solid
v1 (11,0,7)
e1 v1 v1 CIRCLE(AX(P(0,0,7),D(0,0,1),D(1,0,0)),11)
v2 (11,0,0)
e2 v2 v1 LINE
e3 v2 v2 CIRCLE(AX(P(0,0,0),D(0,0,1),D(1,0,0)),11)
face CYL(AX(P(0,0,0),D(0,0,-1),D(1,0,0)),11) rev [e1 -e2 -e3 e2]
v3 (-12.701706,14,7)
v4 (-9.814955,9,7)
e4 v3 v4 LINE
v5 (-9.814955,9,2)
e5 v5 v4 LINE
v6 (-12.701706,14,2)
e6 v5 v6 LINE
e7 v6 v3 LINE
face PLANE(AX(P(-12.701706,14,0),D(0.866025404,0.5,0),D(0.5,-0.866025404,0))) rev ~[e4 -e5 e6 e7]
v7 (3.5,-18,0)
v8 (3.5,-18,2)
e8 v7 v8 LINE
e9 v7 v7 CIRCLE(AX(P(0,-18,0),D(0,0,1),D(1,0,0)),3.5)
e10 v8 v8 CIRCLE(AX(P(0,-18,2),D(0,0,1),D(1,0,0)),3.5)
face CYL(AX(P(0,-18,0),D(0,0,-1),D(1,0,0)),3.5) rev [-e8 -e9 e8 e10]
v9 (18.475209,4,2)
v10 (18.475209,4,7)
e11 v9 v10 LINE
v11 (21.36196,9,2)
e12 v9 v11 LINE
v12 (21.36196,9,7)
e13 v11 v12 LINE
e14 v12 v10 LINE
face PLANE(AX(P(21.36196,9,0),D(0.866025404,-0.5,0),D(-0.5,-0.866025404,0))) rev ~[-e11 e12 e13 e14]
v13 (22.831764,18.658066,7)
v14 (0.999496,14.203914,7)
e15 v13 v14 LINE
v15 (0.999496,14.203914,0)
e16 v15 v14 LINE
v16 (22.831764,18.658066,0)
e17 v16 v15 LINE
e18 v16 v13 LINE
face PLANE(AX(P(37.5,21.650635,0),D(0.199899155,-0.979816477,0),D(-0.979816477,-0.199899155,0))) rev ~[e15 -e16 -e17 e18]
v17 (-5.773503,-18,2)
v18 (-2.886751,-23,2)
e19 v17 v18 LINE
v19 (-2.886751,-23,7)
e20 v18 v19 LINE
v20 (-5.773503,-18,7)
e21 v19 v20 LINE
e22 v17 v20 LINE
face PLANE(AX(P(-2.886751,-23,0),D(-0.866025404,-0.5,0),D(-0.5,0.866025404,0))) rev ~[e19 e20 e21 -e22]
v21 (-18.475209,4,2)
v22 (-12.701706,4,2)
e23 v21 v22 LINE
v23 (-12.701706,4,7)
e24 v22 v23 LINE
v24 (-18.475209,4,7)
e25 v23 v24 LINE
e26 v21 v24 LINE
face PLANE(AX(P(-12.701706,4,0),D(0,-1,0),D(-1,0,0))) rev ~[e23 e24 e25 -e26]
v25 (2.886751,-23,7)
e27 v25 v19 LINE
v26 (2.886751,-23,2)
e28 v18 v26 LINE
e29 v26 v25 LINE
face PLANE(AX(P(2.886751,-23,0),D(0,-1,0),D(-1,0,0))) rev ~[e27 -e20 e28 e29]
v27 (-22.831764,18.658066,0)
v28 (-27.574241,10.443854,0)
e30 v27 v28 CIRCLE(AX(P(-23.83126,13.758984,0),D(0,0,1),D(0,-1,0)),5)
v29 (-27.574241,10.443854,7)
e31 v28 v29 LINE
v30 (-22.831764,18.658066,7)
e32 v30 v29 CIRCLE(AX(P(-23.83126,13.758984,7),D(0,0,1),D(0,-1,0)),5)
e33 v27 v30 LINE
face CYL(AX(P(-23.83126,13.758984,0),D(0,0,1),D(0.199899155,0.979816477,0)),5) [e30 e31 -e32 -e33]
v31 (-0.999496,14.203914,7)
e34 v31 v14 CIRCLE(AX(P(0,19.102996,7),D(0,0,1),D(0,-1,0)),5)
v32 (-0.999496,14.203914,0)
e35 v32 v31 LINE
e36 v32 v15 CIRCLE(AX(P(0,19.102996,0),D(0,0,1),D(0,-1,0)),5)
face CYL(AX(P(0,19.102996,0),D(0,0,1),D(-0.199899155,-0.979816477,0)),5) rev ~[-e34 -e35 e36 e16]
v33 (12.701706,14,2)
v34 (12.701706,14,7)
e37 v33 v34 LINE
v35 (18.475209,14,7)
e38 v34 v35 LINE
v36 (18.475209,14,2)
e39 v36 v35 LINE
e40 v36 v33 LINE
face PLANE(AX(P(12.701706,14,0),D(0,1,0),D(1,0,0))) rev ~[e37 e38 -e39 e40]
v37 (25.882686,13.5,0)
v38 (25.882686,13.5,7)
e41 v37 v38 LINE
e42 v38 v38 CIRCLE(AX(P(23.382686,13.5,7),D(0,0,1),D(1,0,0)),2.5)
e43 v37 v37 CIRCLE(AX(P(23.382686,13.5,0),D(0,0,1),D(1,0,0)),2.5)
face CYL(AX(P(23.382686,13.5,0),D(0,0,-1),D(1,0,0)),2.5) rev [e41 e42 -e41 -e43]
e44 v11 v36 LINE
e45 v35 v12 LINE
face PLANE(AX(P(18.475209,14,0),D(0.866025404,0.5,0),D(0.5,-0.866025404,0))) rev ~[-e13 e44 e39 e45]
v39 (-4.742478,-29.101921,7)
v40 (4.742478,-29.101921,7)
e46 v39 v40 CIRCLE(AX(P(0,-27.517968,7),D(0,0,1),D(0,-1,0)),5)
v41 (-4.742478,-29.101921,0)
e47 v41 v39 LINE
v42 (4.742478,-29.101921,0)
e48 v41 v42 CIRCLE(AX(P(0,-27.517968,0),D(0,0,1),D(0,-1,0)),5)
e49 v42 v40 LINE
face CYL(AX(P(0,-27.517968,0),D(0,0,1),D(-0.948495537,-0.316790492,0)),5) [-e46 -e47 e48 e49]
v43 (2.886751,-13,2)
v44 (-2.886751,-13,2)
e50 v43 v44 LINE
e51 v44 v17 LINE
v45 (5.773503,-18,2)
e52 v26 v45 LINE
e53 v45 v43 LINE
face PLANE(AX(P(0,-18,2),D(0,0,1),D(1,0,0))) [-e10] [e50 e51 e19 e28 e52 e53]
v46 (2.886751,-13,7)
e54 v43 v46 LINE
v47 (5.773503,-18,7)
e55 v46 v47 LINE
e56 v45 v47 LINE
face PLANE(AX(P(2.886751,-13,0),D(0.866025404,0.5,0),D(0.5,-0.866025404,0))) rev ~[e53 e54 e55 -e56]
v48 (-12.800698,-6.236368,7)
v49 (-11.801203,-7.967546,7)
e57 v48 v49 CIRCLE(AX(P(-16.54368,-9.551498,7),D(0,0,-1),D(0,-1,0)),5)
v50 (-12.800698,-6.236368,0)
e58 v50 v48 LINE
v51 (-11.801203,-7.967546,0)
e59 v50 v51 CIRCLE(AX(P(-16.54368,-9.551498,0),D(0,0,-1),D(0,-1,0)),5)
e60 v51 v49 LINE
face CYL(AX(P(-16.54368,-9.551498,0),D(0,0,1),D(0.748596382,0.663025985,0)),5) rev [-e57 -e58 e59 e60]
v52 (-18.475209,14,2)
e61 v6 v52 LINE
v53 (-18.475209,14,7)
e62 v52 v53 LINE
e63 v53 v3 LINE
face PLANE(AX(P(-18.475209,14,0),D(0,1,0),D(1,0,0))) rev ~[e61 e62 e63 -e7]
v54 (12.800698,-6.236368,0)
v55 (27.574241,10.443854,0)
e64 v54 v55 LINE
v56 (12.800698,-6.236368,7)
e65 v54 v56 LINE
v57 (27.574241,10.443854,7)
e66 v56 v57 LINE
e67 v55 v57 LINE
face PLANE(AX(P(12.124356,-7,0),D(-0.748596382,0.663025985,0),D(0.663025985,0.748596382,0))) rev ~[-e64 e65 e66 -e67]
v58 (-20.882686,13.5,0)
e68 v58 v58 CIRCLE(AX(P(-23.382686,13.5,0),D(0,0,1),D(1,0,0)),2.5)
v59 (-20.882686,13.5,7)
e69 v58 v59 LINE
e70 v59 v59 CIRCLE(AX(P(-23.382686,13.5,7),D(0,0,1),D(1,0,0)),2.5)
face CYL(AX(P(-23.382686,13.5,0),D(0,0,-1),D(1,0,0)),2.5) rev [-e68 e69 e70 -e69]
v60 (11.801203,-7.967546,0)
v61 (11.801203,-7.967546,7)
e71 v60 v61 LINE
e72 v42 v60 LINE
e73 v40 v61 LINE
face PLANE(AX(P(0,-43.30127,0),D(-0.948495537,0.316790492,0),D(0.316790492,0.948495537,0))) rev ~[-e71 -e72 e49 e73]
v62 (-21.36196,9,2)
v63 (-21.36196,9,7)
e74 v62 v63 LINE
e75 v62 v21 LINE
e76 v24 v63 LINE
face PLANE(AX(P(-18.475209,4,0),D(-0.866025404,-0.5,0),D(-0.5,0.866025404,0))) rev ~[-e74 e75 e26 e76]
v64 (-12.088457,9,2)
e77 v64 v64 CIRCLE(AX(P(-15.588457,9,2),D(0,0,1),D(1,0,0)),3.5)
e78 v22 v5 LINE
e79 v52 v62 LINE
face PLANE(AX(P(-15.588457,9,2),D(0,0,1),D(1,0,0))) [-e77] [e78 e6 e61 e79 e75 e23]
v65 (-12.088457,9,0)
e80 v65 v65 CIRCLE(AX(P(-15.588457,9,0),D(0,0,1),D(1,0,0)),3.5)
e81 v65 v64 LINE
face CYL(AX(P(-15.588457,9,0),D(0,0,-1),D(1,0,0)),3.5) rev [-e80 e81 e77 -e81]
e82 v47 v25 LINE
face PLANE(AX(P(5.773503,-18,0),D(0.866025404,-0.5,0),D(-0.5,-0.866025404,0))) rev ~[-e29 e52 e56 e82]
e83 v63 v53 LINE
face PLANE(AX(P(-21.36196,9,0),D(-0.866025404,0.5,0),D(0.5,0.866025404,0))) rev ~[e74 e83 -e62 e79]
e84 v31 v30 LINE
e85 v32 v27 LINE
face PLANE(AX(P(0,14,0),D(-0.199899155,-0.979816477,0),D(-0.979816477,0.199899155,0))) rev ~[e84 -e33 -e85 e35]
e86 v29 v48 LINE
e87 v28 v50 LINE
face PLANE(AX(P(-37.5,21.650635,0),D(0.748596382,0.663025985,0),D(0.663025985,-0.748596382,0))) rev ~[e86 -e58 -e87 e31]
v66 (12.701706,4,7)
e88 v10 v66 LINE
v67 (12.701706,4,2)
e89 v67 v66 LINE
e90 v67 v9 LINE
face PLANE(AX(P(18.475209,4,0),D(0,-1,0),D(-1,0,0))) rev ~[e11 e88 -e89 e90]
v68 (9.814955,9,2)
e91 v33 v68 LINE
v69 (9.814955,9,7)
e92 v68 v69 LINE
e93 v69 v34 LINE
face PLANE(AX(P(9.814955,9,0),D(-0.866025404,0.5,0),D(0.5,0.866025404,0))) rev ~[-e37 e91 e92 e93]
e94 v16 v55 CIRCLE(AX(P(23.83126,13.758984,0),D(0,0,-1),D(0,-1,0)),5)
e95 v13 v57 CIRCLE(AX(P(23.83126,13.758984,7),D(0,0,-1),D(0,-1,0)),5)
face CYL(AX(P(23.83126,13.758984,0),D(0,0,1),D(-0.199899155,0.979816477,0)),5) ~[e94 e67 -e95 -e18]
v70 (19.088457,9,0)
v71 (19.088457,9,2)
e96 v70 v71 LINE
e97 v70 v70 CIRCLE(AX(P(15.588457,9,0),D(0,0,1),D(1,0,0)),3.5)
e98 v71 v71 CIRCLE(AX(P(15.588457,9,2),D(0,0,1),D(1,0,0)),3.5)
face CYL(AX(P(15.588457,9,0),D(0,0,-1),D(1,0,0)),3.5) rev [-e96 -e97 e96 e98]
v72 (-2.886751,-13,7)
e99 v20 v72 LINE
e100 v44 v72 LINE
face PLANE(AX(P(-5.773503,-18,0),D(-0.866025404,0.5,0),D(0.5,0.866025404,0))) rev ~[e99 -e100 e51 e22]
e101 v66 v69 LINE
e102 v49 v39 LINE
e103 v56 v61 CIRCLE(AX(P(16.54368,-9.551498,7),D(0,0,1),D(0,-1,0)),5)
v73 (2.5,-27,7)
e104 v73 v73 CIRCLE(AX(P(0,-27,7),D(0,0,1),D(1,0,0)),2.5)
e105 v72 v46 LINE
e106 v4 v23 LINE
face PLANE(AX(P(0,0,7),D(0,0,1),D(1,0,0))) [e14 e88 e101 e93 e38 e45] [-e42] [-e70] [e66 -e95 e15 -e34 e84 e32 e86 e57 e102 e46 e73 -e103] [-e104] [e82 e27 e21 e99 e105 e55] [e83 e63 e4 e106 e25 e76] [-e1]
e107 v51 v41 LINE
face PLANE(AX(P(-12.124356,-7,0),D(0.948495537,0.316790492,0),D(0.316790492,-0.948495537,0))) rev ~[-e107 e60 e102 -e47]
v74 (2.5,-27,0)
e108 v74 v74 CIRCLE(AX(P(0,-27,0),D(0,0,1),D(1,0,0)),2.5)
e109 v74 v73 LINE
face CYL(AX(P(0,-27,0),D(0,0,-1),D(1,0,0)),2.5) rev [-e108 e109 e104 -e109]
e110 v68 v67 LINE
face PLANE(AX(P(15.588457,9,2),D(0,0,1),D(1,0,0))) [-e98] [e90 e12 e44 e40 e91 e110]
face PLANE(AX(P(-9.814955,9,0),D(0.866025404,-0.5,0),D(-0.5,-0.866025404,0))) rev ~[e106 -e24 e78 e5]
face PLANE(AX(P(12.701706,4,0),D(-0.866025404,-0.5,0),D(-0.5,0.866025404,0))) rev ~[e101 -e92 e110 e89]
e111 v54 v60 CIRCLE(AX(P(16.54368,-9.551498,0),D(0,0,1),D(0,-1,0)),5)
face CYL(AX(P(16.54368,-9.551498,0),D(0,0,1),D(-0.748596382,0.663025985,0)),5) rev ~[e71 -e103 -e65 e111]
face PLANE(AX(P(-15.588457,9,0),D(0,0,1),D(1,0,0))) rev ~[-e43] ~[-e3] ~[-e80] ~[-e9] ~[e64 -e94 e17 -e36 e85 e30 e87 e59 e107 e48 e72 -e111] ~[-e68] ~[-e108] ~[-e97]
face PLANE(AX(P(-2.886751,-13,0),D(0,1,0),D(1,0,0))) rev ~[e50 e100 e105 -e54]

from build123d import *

# Parameters (mm, degrees)
F0_R     = 2.5
F0_R_2   = 11
F1_DEPTH = 7
F0_R_3   = 3.5
F2_DEPTH = 2
F3_R     = 5


# Not quite as in the source:
# - a feature names something its author has since deleted; it is built from what else it names


with BuildPart() as f1:
    # F0 (on Top) → F1 (new body)
    with BuildSketch(Plane.XY):
        Polygon((0, 14), (-37.5, 21.6506350946), (-12.124355653, -7), (0, -43.3012701892), (12.124355653, -7), (37.5, 21.6506350946), align=None)
        with Locations((0, -27)):
            Circle(F0_R, mode=Mode.SUBTRACT)
        Polygon((2.8867513459, -13), (5.7735026919, -18), (2.8867513459, -23), (-2.8867513459, -23), (-5.7735026919, -18), (-2.8867513459, -13), align=None, mode=Mode.SUBTRACT)
        with Locations((-23.3826859022, 13.5)):
            Circle(F0_R, mode=Mode.SUBTRACT)
        Polygon((-12.7017059222, 4), (-18.4752086141, 4), (-21.36195996, 9), (-18.4752086141, 14), (-12.7017059222, 14), (-9.8149545762, 9), align=None, mode=Mode.SUBTRACT)
        Circle(F0_R_2, mode=Mode.SUBTRACT)
        Polygon((21.36195996, 9), (18.4752086141, 4), (12.7017059222, 4), (9.8149545762, 9), (12.7017059222, 14), (18.4752086141, 14), align=None, mode=Mode.SUBTRACT)
        with Locations((23.3826859022, 13.5)):
            Circle(F0_R, mode=Mode.SUBTRACT)
    extrude(amount=F1_DEPTH)

    # F0 (on Top) → F2 (join)
    with BuildSketch(Plane.XY):
        Polygon((-21.36195996, 9), (-18.4752086141, 4), (-12.7017059222, 4), (-9.8149545762, 9), (-12.7017059222, 14), (-18.4752086141, 14), align=None)
        with Locations((-15.5884572681, 9)):
            Circle(F0_R_3, mode=Mode.SUBTRACT)
        Polygon((2.8867513459, -23), (5.7735026919, -18), (2.8867513459, -13), (-2.8867513459, -13), (-5.7735026919, -18), (-2.8867513459, -23), align=None)
        with Locations((0, -18)):
            Circle(F0_R_3, mode=Mode.SUBTRACT)
        Polygon((12.7017059222, 4), (18.4752086141, 4), (21.36195996, 9), (18.4752086141, 14), (12.7017059222, 14), (9.8149545762, 9), align=None)
        with Locations((15.5884572681, 9)):
            Circle(F0_R_3, mode=Mode.SUBTRACT)
    extrude(amount=F2_DEPTH)

    # F3
    f3_edges = [f1.edges().sort_by_distance(p)[0] for p in [
        (37.5, 21.650635, 3.5),
        (-37.5, 21.650635, 3.5),
        (0, -43.30127, 3.5),
        (-12.124356, -7, 3.5),
        (0, 14, 3.5),
        (12.124356, -7, 3.5),
    ]]
    fillet(f3_edges, radius=F3_R)


solid = f1.part
